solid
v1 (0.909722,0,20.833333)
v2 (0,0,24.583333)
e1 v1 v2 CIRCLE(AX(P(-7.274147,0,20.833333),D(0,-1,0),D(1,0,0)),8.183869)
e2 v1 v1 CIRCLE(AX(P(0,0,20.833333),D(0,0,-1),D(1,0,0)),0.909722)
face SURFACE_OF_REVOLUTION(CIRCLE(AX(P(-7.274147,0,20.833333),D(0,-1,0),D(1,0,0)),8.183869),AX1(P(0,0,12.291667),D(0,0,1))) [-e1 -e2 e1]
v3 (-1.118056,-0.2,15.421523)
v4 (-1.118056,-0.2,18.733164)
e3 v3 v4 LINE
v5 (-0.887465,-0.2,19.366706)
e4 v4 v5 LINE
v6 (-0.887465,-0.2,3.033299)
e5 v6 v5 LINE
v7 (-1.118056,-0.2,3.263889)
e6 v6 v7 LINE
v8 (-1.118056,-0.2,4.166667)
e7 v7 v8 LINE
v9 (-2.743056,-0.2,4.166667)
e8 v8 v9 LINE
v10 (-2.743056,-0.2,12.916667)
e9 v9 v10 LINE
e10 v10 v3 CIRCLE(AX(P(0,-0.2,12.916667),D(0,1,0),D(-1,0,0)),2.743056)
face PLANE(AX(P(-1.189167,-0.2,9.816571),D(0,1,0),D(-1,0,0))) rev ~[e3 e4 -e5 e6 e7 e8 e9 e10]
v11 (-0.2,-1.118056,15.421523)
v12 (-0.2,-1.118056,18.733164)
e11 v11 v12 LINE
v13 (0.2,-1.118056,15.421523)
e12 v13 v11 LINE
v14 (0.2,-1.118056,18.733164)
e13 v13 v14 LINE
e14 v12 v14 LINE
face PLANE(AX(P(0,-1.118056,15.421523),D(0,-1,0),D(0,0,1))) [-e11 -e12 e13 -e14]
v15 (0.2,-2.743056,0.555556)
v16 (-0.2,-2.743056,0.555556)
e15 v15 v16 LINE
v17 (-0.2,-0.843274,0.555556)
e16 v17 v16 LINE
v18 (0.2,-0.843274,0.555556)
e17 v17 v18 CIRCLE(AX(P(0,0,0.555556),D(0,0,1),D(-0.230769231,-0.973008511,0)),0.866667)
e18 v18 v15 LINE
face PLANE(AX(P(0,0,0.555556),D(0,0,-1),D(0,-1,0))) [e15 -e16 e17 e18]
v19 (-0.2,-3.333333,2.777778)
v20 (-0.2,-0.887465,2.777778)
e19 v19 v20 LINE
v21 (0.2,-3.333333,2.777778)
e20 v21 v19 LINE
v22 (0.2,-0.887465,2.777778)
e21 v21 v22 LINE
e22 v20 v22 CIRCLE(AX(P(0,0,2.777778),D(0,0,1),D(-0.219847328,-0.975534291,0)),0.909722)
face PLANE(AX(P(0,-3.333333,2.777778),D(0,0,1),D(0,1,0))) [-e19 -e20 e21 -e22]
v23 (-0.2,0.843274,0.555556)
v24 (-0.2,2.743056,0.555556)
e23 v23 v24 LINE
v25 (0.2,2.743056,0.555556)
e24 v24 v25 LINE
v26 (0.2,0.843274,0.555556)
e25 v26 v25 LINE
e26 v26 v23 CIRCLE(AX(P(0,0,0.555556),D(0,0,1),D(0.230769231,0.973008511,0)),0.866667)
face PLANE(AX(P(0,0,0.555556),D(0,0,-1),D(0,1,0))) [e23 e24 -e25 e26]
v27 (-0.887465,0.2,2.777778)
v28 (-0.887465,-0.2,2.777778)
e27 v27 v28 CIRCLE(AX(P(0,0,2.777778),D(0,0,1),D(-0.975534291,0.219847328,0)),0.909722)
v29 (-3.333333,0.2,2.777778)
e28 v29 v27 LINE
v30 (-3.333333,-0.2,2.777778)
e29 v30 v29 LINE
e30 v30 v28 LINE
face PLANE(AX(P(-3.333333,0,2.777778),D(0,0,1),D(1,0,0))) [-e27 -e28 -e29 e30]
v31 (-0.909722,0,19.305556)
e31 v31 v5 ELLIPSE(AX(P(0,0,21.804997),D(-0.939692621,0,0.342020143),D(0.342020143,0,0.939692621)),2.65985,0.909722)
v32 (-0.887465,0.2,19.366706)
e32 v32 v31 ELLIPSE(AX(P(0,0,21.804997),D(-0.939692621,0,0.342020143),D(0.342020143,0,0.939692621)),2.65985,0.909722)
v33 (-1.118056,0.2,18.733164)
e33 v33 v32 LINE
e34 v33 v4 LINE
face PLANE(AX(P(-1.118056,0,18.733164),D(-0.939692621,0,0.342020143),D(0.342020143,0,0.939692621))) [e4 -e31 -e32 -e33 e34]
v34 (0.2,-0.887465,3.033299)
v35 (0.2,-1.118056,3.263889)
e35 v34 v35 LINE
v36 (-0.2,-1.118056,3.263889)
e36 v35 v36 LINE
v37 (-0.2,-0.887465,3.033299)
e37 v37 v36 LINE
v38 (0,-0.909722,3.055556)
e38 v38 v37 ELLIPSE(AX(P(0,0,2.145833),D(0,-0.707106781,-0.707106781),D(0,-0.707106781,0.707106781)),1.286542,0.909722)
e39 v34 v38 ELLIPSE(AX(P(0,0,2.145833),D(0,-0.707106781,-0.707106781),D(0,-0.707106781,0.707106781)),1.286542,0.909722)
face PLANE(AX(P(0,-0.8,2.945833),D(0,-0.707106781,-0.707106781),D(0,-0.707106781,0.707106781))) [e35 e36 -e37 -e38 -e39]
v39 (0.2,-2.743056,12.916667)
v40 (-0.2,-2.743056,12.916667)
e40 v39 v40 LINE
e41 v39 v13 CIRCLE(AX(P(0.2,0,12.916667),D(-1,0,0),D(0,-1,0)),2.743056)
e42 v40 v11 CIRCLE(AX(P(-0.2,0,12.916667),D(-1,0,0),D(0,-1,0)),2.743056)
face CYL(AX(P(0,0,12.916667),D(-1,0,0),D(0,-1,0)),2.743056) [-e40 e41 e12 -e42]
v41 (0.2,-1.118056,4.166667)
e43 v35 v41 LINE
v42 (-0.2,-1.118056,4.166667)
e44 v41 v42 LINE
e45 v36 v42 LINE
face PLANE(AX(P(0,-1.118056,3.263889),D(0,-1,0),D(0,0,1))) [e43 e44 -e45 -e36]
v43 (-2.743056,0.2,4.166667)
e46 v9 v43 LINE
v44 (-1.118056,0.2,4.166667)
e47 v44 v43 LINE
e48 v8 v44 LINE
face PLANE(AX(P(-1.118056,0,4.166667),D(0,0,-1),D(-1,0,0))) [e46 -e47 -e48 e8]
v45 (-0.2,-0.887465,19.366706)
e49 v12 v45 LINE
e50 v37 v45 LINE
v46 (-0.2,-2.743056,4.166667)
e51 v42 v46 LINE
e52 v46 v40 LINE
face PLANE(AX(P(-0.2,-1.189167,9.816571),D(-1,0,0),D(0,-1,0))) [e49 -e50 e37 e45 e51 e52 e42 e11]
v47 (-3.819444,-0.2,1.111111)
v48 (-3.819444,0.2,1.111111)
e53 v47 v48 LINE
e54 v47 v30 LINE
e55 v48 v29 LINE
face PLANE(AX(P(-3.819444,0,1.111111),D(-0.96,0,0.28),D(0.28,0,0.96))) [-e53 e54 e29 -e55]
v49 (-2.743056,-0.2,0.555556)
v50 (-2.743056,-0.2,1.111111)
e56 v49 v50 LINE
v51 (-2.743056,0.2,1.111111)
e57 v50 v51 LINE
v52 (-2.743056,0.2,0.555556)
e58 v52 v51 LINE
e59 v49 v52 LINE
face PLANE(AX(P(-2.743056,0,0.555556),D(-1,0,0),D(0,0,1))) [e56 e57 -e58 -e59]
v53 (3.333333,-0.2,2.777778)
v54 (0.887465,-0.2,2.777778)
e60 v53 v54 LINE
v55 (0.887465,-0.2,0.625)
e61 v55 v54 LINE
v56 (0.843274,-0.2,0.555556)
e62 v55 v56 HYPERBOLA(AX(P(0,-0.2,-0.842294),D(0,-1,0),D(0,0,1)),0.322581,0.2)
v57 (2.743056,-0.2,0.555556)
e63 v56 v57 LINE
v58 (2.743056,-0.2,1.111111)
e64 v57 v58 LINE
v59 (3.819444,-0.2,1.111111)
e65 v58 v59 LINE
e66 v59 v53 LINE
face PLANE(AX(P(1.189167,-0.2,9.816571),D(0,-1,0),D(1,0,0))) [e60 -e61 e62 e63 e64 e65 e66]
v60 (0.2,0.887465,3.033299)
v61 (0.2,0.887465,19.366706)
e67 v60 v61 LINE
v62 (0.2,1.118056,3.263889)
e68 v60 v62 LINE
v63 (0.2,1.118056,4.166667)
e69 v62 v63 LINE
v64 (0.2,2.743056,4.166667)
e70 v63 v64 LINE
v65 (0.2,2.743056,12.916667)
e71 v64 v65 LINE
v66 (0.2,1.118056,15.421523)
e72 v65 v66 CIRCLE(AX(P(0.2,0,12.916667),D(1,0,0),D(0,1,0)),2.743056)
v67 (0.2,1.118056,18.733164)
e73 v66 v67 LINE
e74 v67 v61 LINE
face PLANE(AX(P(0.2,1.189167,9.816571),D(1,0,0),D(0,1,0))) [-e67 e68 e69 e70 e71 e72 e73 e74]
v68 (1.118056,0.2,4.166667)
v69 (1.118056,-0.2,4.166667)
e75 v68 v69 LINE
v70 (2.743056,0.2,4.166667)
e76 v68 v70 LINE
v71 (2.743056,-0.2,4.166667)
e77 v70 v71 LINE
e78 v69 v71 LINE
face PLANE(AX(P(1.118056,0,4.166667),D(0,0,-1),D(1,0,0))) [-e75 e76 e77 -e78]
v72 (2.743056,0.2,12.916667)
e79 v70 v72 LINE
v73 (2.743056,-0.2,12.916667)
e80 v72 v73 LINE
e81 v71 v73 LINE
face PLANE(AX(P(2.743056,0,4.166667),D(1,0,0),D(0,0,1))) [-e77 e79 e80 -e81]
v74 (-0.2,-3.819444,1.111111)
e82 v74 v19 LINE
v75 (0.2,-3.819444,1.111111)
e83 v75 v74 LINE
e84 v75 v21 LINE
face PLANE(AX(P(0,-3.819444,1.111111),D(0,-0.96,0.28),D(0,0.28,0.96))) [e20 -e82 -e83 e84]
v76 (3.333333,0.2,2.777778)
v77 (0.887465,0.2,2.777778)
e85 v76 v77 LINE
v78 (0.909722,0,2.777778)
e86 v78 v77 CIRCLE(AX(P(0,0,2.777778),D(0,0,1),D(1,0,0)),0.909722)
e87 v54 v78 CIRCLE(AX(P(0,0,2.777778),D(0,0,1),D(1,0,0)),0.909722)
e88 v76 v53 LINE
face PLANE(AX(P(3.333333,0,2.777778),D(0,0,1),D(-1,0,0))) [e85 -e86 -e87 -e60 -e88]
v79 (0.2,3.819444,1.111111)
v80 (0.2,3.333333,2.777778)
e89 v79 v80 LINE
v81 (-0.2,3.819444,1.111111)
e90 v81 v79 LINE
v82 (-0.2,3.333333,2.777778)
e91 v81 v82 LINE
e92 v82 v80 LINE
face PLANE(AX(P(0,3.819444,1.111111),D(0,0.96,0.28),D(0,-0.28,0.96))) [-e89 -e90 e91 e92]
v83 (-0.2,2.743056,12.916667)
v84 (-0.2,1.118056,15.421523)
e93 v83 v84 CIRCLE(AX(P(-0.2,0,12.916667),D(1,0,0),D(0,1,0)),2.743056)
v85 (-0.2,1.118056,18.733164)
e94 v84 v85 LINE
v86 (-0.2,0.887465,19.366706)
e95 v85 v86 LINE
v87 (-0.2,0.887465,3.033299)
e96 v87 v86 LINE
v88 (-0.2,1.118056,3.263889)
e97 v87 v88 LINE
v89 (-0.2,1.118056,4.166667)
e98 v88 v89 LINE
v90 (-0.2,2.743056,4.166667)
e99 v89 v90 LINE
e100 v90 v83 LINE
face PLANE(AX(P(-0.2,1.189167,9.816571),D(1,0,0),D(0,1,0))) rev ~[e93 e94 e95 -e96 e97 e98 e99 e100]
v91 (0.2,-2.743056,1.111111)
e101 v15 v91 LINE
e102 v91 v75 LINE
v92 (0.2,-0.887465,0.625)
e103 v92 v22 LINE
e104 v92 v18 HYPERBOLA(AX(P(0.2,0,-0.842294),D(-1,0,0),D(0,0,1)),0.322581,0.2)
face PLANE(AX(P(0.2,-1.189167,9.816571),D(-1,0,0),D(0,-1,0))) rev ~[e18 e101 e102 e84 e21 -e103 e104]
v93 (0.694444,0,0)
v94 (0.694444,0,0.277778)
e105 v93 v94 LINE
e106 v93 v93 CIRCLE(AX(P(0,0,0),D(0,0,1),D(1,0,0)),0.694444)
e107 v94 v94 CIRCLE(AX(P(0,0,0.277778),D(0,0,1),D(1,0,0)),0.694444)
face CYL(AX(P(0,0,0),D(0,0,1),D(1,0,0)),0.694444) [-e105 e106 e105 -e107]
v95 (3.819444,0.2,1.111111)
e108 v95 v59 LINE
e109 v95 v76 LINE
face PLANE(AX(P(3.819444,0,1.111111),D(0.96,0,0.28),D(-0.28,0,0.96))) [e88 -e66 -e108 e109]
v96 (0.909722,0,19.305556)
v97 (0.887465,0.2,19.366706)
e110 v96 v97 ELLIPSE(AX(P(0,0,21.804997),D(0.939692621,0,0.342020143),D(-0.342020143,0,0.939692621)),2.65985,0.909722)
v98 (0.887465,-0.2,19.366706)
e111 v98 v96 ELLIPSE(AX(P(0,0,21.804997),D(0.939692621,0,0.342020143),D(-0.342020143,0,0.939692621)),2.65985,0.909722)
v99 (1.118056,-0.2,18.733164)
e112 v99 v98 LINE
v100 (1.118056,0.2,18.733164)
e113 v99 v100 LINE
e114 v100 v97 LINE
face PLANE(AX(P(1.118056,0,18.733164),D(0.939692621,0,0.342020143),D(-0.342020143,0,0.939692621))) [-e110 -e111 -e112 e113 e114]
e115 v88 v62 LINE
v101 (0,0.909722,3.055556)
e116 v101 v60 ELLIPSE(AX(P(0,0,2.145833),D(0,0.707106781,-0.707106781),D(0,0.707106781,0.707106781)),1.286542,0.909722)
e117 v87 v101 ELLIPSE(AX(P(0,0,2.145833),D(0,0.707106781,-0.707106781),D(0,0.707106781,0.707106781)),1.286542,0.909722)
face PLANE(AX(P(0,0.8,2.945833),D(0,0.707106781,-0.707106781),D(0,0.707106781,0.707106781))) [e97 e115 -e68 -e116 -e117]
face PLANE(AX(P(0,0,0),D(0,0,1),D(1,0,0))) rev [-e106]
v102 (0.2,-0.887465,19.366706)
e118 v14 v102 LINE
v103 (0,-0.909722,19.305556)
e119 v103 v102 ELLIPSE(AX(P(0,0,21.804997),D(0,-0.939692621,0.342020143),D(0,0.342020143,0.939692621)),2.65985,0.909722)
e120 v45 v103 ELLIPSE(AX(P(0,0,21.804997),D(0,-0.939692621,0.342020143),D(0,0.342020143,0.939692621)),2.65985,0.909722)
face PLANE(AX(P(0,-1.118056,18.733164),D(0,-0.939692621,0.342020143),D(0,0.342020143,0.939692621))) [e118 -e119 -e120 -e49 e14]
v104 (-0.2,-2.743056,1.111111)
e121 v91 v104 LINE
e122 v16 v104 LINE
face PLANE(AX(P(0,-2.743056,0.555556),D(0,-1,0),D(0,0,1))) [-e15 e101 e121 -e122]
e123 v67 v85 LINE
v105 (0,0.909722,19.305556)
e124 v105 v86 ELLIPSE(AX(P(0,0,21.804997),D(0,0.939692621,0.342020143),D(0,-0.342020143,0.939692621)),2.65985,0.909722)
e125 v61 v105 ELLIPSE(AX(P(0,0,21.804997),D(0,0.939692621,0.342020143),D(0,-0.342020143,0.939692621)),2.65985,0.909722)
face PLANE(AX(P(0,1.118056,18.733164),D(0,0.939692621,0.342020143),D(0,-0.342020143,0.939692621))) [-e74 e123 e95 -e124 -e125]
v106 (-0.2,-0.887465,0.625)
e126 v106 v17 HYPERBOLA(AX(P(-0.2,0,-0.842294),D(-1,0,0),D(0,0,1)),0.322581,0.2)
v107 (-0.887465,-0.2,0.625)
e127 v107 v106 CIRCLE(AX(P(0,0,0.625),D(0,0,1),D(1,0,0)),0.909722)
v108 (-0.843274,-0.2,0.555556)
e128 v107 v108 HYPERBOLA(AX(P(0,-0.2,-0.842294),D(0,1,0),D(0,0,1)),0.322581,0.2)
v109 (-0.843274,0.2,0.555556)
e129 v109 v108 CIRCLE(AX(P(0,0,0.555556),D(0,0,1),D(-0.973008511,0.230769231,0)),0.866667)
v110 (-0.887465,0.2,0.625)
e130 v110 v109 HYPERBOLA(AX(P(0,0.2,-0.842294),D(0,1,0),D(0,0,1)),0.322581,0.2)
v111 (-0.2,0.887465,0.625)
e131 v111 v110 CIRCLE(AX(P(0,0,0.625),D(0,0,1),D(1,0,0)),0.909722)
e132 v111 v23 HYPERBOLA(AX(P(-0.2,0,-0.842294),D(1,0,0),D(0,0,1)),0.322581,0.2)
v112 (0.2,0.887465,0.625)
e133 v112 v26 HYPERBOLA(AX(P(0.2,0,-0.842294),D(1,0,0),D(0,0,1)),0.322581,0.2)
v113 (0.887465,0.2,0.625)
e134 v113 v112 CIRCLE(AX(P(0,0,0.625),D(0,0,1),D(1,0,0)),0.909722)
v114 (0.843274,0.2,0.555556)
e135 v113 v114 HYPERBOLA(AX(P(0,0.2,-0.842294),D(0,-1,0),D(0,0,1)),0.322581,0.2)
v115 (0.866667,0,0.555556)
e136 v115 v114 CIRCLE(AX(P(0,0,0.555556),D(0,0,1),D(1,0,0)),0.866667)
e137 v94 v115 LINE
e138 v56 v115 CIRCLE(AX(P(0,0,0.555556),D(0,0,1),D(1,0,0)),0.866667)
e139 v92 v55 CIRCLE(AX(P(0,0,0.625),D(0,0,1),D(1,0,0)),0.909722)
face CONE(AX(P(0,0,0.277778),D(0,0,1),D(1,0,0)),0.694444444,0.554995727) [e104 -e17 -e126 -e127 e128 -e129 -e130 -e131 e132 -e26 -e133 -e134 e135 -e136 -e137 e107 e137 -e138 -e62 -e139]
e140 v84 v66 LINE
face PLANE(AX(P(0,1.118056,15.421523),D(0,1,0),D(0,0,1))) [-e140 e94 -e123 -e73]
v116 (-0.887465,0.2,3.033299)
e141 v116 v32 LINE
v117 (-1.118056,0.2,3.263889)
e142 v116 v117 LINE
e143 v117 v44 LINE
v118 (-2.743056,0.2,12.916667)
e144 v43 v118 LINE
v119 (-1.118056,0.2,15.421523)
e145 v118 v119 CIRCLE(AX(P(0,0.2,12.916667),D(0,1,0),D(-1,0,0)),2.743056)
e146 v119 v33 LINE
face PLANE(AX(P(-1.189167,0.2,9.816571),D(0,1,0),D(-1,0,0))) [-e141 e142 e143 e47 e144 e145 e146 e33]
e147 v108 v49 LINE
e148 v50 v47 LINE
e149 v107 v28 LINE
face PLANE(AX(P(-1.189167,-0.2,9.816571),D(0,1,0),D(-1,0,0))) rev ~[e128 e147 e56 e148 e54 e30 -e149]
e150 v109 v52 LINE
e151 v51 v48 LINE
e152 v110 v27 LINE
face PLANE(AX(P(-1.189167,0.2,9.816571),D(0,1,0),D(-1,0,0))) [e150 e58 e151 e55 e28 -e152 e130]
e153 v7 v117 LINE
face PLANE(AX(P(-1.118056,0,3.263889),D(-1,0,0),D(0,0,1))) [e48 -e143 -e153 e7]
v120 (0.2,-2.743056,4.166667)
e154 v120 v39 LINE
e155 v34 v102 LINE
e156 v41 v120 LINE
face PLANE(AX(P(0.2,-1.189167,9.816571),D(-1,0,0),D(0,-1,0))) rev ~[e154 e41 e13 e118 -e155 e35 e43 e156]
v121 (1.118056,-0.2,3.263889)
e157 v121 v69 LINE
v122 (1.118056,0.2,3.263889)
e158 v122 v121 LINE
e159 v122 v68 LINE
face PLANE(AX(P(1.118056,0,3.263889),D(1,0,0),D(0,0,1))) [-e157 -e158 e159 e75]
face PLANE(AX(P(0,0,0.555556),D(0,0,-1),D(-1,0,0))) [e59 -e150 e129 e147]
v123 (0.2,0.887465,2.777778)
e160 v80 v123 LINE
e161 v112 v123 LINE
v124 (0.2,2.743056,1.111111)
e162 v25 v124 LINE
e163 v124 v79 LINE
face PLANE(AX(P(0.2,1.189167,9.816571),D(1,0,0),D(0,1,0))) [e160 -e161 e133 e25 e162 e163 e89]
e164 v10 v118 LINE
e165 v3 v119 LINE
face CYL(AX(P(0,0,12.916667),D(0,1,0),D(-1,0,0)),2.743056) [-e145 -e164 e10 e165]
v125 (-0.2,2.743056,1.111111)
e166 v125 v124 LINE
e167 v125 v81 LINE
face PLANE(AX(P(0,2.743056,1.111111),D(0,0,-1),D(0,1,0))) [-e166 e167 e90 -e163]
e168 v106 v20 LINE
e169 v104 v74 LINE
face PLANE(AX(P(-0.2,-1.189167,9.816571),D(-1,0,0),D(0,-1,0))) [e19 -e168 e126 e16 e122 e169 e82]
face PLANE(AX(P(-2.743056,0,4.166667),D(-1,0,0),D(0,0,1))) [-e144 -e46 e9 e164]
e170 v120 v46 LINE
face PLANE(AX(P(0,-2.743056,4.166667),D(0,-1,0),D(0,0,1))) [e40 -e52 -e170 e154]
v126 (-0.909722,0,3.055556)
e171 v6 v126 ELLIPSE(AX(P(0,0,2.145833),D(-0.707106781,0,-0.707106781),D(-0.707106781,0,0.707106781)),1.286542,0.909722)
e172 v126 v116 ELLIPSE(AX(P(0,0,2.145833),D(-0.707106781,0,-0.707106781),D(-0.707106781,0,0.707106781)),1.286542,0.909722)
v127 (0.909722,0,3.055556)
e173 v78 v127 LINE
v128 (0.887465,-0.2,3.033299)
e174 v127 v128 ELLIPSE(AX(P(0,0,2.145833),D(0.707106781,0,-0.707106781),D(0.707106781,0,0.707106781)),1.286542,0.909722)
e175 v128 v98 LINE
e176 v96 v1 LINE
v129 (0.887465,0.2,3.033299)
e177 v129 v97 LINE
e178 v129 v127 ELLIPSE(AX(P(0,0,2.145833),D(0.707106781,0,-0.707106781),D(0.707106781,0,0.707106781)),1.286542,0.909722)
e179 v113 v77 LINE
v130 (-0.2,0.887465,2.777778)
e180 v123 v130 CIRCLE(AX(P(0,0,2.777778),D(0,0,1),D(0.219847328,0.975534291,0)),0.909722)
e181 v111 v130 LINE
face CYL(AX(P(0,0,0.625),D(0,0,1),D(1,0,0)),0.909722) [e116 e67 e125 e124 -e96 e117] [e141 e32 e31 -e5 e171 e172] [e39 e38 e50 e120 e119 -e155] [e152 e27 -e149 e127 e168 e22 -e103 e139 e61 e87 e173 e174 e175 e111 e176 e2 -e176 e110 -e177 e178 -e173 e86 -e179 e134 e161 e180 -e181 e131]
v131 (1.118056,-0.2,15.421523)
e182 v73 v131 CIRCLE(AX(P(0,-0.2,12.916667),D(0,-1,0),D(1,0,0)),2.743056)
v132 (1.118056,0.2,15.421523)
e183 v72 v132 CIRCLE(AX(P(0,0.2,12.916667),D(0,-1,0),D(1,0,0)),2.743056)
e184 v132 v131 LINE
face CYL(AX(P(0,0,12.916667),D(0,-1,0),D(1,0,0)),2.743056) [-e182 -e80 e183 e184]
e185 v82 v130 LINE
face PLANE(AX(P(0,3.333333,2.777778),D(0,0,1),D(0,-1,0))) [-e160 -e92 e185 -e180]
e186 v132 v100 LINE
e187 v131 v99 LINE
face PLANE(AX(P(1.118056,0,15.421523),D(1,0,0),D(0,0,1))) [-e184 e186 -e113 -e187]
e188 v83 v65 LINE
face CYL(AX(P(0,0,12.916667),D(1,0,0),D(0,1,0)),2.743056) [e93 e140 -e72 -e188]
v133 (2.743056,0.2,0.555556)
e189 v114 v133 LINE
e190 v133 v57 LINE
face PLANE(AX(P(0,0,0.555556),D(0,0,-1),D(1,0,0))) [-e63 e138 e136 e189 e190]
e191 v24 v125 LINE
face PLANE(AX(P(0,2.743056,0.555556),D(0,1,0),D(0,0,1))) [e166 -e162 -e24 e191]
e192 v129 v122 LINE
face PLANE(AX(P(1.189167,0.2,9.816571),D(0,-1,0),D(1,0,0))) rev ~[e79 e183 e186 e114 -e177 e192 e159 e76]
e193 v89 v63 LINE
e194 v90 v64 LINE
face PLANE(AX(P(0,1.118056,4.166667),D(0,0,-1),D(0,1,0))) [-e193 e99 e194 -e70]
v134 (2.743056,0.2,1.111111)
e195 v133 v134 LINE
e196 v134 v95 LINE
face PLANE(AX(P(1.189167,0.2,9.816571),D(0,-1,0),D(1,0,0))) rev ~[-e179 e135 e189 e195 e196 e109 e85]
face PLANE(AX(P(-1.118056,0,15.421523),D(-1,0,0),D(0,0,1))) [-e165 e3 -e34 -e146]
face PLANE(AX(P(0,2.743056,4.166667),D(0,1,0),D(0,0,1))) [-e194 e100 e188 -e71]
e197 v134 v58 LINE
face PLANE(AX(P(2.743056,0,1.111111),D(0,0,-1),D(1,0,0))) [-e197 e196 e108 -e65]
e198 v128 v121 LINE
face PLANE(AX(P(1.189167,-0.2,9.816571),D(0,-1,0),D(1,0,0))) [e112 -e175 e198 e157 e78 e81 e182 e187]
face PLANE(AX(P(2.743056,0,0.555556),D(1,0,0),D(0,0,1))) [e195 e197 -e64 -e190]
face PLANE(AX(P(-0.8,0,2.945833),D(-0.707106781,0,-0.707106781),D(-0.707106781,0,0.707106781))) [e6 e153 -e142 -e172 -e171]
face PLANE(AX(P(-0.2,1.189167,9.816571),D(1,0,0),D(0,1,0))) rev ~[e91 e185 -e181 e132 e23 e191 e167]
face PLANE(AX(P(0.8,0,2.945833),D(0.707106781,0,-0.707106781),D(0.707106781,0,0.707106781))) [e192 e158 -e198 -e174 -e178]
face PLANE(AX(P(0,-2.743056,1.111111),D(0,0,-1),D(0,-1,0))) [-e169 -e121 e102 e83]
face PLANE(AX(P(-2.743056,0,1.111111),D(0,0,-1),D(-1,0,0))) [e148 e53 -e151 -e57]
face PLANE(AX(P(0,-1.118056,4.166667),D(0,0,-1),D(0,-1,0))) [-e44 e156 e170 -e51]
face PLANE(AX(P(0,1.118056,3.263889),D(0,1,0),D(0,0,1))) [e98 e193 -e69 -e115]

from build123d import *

# Parameters (mm, degrees)
F3_DEPTH = 0.2
F4_COUNT = 4


# Not quite as in the source:
# - a feature names something its author has since deleted; it is built from what else it names


with BuildPart() as f1:
    # F0 (on Front) → F1 (revolve)
    with BuildSketch(Plane.XZ):
        with BuildLine():
            Line((0, 24.5833333333), (0, 0))
            Line((0, 0), (0.6944444444, 0))
            Line((0.6944444444, 0), (0.6944444444, 0.2777777778))
            Line((0.6944444444, 0.2777777778), (0.9097222222, 0.625))
            Line((0.9097222222, 0.625), (0.9097222222, 20.8333333333))
            ThreePointArc((0.9097222222, 20.8333333333), (0.6790405117, 22.7627175953), (0, 24.5833333333))
        make_face()
    revolve(axis=Axis((0, 0, 12.2916666667), (0, 0, 1)))

    # F2 (on Front) → F3 (join, symmetric)
    with BuildSketch(Plane.XZ):
        with BuildLine():
            Line((0, 0.625), (0, 0.5555555556))
            Line((0, 0.5555555556), (2.7430555556, 0.5555555556))
            Line((2.7430555556, 0.5555555556), (2.7430555556, 1.1111111111))
            Line((2.7430555556, 1.1111111111), (3.8194444444, 1.1111111111))
            Line((3.8194444444, 1.1111111111), (3.3333333333, 2.7777777778))
            Line((3.3333333333, 2.7777777778), (0.8, 2.7777777778))
            Line((0.8, 2.7777777778), (0.8, 2.9458333333))
            Line((0.8, 2.9458333333), (1.1180555556, 3.2638888889))
            Line((1.1180555556, 3.2638888889), (1.1180555556, 4.1666666667))
            Line((1.1180555556, 4.1666666667), (2.7430555556, 4.1666666667))
            Line((2.7430555556, 4.1666666667), (2.7430555556, 12.9166666667))
            ThreePointArc((2.7430555556, 12.9166666667), (2.3012216629, 14.4095607148), (1.1180555556, 15.4215230609))
            Line((1.1180555556, 15.4215230609), (1.1180555556, 18.7331644265))
            Line((1.1180555556, 18.7331644265), (0, 21.8049968191))
            Line((0, 21.8049968191), (0, 0.625))
        make_face()
    extrude(amount=F3_DEPTH, both=True)

    # F4: F1 ×4 about axis
    f4_axis = Axis((0, 0, 0.625), (0, 0, 1))


with BuildPart() as f1_1:
    add(f1.part)
    for i in range(1, F4_COUNT):
        add(f1.part.rotate(f4_axis, i * 360 / F4_COUNT))


solid = f1_1.part
